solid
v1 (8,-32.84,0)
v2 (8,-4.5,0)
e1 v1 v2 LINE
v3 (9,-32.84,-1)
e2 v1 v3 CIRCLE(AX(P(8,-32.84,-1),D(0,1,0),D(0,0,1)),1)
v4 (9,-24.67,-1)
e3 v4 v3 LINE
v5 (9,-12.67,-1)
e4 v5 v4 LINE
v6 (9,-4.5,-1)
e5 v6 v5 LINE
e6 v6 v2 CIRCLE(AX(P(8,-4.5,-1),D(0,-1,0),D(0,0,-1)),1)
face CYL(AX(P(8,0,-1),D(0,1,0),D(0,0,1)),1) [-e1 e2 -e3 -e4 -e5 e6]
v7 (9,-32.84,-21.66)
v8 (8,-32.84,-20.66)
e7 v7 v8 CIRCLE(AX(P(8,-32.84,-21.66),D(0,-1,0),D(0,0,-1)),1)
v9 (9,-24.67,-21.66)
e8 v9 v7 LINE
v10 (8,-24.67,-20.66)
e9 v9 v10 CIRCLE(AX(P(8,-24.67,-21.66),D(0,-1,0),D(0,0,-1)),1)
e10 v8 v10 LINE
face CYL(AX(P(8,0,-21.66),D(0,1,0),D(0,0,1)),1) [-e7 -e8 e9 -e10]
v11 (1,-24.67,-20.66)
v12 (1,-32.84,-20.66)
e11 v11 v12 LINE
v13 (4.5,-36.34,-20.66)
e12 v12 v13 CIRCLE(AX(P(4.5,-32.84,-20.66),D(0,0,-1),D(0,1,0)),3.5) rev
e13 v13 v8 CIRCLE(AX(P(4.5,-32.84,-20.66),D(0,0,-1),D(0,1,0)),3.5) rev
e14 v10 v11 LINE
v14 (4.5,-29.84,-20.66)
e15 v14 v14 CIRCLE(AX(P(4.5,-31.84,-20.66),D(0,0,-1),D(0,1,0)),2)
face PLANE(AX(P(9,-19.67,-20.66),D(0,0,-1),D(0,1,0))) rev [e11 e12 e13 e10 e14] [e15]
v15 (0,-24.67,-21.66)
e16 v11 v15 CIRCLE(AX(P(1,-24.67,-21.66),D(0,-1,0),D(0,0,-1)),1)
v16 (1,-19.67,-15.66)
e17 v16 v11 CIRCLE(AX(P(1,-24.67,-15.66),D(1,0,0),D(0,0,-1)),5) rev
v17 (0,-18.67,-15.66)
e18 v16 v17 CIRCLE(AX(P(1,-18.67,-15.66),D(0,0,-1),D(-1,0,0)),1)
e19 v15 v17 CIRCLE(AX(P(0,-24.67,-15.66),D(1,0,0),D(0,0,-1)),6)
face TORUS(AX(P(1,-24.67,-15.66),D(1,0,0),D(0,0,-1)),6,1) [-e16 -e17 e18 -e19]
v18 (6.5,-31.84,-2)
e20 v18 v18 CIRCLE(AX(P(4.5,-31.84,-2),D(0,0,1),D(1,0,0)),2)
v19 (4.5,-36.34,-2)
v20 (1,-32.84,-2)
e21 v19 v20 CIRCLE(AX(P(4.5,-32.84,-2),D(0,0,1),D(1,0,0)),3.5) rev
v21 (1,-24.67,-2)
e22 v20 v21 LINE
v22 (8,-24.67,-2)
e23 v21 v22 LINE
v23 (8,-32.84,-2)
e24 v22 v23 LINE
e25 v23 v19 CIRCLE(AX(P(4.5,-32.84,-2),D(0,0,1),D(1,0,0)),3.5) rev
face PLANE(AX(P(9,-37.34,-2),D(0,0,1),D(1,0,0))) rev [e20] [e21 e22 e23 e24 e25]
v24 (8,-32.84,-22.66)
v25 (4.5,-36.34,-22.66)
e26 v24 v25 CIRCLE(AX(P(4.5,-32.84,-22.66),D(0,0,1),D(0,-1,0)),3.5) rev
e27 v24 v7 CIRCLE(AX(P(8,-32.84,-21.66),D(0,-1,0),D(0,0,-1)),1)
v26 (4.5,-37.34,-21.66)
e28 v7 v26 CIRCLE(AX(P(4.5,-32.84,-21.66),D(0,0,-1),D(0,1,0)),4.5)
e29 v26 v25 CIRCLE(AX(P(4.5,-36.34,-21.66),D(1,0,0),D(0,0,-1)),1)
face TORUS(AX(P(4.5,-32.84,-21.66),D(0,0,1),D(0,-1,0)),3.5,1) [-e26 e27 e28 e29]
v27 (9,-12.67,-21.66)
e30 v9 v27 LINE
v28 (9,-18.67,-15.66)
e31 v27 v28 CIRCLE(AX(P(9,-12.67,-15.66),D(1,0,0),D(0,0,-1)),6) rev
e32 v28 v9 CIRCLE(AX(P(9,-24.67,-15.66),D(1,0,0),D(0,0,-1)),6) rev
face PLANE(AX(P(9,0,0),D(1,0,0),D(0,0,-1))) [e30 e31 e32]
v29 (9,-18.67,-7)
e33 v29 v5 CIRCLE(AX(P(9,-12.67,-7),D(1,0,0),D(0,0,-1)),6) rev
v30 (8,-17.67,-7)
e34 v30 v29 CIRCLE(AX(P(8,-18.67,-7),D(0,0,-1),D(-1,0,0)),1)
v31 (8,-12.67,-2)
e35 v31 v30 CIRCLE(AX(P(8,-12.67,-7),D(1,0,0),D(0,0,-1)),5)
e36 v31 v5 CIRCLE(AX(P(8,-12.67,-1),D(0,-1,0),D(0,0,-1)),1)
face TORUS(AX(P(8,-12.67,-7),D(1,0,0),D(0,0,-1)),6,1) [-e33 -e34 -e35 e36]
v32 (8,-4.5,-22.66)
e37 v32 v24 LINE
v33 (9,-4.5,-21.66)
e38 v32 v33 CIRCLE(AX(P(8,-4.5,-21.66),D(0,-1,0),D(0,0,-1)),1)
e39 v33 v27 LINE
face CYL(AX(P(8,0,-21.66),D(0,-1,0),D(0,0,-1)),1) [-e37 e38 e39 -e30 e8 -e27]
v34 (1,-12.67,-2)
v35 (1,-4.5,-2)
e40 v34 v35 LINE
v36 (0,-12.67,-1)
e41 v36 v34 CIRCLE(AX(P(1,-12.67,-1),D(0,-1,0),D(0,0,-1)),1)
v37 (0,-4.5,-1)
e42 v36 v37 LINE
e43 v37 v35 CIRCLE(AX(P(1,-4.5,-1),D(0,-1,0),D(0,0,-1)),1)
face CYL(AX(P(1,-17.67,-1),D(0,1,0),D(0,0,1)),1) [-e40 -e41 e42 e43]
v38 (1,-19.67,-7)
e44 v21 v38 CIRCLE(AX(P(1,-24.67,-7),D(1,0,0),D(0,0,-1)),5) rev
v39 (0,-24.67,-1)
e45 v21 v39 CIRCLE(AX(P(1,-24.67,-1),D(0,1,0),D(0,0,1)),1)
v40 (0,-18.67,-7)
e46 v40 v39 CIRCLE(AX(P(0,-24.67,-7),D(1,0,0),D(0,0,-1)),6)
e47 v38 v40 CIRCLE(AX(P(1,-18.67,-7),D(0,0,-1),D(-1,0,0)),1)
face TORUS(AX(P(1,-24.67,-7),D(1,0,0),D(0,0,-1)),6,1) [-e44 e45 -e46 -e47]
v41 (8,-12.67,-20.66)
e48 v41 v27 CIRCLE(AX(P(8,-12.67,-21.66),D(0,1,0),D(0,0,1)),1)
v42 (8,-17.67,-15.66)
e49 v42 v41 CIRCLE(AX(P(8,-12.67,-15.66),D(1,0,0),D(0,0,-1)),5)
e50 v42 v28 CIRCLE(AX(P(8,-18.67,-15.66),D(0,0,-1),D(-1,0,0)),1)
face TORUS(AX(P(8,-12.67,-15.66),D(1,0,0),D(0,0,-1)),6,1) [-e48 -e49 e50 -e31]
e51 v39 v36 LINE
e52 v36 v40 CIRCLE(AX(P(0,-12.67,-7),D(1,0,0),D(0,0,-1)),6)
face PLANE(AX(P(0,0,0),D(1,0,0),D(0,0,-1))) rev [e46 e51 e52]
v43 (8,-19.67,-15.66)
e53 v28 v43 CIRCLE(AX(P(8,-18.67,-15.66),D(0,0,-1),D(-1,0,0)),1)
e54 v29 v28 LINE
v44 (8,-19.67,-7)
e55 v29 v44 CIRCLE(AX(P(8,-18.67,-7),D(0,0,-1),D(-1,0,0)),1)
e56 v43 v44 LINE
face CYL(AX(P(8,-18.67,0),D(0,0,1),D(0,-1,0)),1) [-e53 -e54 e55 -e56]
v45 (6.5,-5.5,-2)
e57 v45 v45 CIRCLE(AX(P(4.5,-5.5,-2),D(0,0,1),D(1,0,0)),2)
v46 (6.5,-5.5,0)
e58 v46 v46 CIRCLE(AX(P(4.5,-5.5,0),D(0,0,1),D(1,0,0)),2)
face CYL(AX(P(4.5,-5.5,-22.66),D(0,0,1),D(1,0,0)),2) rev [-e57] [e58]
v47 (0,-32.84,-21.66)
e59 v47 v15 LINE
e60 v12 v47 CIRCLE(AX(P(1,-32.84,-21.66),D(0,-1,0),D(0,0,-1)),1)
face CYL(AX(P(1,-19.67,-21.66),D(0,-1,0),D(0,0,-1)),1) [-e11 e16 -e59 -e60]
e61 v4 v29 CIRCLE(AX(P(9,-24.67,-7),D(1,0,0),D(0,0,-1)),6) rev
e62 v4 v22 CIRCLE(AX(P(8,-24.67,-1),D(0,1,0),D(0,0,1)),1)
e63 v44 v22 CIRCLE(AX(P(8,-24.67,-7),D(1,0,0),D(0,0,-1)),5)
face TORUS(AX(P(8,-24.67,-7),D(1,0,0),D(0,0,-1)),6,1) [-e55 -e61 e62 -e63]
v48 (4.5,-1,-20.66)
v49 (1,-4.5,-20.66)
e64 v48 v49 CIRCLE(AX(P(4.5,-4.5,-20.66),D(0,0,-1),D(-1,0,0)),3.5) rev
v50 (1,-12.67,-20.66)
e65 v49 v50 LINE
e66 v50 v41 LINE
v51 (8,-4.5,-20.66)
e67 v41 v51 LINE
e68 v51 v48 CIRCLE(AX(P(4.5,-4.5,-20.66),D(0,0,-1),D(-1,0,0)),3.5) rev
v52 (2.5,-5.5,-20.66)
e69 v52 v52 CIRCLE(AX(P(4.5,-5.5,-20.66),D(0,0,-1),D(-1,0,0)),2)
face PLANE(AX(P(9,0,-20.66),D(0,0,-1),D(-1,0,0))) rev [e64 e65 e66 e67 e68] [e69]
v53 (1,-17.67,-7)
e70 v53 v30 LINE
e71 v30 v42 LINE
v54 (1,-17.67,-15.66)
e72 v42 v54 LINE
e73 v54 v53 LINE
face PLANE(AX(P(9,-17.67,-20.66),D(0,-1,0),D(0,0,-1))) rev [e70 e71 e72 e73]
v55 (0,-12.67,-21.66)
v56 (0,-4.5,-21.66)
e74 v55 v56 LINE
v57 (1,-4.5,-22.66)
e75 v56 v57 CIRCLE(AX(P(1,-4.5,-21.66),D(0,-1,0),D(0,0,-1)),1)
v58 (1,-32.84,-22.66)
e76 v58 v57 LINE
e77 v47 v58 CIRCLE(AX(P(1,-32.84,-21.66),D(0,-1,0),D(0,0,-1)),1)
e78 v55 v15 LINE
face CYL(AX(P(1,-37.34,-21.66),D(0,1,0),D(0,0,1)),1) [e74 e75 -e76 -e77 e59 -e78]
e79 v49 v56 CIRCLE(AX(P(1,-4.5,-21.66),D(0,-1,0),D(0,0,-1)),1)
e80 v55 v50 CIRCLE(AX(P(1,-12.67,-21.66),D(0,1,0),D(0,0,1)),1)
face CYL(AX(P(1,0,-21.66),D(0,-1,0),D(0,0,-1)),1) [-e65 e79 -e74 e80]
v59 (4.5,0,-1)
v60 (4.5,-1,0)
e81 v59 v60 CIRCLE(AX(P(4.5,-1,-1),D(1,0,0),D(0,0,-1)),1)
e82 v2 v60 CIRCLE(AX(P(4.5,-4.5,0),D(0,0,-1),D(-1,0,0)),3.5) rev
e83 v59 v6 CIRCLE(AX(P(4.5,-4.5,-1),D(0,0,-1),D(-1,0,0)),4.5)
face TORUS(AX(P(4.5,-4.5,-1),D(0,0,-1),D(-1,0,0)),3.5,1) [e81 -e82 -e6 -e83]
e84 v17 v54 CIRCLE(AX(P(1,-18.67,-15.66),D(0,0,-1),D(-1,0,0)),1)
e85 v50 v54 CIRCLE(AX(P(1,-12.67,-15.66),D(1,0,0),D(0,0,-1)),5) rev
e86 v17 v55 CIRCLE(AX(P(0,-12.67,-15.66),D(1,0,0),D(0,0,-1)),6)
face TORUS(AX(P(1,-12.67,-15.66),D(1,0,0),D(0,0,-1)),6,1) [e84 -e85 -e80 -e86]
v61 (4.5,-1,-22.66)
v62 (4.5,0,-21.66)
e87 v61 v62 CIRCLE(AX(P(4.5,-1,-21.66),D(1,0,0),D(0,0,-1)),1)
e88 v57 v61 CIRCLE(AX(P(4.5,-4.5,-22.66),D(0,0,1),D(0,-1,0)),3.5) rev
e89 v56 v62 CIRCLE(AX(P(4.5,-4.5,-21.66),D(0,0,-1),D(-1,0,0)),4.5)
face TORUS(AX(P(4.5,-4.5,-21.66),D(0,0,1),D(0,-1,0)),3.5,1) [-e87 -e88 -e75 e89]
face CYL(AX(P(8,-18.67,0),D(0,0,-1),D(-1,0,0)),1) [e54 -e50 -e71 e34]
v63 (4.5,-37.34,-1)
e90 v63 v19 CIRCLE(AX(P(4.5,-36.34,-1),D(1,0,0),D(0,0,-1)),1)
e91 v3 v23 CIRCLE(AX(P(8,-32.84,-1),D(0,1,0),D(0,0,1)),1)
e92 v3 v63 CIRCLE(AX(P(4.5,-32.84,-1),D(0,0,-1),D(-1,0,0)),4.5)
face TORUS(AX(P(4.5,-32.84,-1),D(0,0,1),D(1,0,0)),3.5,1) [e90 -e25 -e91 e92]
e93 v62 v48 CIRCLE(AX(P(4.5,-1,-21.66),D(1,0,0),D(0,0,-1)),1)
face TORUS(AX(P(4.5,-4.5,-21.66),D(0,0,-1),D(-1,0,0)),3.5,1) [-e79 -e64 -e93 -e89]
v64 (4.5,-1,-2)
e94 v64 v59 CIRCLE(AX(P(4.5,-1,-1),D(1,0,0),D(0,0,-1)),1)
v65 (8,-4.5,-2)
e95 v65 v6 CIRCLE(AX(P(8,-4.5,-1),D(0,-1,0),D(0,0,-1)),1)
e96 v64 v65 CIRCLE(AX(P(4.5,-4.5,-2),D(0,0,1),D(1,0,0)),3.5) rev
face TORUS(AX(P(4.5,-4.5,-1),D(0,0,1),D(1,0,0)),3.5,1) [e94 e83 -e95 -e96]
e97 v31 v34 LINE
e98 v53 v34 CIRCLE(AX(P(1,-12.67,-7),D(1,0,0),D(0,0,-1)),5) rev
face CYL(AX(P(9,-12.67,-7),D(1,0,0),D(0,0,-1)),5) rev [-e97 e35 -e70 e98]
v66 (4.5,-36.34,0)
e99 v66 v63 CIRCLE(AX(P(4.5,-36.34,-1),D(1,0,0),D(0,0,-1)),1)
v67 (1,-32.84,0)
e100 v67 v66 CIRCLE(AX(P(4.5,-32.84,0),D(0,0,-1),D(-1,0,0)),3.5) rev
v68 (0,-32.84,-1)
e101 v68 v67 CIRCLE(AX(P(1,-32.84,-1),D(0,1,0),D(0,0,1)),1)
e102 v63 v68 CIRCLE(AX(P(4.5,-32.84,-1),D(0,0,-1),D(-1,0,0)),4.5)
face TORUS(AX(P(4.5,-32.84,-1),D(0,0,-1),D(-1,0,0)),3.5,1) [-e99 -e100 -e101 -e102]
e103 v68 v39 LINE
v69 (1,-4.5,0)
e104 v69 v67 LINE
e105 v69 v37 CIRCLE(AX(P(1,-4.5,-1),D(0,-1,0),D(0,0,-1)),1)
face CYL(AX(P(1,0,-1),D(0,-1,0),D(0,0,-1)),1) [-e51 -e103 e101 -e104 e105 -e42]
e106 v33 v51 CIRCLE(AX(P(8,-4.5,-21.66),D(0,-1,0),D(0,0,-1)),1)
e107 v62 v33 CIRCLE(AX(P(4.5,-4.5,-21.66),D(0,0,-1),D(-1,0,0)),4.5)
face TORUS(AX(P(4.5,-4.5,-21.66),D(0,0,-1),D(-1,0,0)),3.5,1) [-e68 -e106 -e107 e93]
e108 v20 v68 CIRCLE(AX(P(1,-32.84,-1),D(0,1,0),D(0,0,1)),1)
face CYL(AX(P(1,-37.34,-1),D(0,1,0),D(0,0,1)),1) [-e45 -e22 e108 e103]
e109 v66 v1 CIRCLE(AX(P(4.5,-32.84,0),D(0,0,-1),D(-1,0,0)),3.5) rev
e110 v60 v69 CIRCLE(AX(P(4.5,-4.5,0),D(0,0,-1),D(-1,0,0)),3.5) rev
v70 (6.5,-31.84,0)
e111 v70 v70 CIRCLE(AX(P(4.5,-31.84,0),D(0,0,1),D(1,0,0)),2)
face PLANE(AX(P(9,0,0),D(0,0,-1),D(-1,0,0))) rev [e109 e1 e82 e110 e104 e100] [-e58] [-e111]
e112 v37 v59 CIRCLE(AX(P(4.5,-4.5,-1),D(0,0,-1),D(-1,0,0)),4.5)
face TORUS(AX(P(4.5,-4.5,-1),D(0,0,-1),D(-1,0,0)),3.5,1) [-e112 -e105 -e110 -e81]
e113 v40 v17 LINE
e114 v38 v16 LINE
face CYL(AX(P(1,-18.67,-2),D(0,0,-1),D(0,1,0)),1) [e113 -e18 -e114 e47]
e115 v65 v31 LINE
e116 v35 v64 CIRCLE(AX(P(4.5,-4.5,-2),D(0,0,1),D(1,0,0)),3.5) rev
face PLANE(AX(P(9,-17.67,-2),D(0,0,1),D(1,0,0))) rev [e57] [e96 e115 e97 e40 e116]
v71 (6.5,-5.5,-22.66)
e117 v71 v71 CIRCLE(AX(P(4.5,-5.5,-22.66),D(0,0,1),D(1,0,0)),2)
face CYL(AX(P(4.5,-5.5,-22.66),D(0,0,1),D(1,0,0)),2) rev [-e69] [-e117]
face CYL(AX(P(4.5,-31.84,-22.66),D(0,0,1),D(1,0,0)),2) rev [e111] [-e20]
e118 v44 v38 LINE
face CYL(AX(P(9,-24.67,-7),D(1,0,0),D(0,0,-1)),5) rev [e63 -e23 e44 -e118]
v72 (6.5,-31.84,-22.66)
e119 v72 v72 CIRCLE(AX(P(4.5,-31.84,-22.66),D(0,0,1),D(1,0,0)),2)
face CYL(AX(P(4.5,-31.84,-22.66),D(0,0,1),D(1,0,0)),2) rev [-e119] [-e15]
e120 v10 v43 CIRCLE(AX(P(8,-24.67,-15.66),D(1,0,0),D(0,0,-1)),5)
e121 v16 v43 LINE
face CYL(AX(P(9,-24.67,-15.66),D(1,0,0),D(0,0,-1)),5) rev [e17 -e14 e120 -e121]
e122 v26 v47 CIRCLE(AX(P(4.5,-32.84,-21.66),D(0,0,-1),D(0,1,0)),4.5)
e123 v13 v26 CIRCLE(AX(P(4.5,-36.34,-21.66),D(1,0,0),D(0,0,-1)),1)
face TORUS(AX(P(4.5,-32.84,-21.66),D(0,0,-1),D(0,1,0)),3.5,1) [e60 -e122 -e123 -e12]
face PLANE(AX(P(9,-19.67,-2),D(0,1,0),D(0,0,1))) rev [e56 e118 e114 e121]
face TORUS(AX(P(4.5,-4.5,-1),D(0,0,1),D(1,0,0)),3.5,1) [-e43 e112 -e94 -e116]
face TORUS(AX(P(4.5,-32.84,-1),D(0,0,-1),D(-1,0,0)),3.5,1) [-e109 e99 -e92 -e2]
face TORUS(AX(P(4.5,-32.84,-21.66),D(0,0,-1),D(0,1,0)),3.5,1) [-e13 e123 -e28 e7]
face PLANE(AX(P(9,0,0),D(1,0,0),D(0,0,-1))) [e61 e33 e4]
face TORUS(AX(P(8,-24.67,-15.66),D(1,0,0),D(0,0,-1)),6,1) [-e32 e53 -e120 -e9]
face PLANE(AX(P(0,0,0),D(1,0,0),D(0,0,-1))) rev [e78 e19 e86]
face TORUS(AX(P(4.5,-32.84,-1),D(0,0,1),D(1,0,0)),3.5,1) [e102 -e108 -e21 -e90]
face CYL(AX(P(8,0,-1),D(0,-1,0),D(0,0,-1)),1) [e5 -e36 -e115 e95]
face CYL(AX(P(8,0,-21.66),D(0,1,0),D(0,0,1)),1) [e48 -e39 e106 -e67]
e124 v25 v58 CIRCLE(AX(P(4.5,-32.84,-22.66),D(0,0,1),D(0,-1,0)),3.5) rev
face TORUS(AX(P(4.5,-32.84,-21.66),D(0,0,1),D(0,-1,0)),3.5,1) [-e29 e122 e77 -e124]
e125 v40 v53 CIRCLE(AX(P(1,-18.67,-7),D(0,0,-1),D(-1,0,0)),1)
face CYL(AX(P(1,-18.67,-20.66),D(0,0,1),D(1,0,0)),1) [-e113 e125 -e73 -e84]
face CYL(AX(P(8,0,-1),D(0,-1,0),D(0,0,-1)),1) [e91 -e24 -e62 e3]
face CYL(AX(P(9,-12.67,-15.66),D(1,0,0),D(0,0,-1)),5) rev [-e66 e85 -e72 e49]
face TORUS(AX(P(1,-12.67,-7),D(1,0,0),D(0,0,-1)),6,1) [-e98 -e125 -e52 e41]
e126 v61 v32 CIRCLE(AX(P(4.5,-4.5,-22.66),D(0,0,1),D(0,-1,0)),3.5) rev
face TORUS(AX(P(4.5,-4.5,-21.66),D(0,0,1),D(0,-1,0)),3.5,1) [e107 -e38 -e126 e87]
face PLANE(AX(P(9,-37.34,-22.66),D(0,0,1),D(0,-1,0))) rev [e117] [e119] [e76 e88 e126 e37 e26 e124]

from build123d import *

# Parameters (mm, degrees)
BOSS_EXTRUDE1_DEPTH = 9
SKETCH2_R           = 2
CUT_EXTRUDE1_DEPTH  = 45.595416805
FILLET1_R           = 5
FILLET3_R           = 4.5
FILLET4_R           = 1


with BuildPart() as part:
    # Sketch1 → Boss-Extrude1 (new body)
    with BuildSketch(Plane(origin=(0, 0, 0), x_dir=(0, 0, -1), z_dir=(1, 0, 0))):
        Polygon((0, 0), (0, -37.34), (2, -37.34), (2, -19.67), (20.66, -19.67), (20.66, -37.34), (22.66, -37.34), (22.66, 0), (20.66, 0), (20.66, -17.67), (2, -17.67), (2, 0), align=None)
    extrude(amount=BOSS_EXTRUDE1_DEPTH)

    # Sketch2 → Cut-Extrude1 (cut, through all)
    with BuildSketch(Plane.XY):
        with Locations((4.5, -5.5)):
            Circle(SKETCH2_R)
        with Locations((4.5, -31.84)):
            Circle(SKETCH2_R)
    extrude(amount=-CUT_EXTRUDE1_DEPTH, mode=Mode.SUBTRACT)

    # Fillet1
    fillet1_edges = [part.edges().sort_by_distance(p)[0] for p in [
        (4.5, -17.67, -2),
        (4.5, -17.67, -20.66),
        (4.5, -19.67, -20.66),
        (4.5, -19.67, -2),
    ]]
    fillet(fillet1_edges, radius=FILLET1_R)

    # Fillet3
    fillet3_edges = [part.edges().sort_by_distance(p)[0] for p in [
        (9, 0, -1),
        (0, 0, -1),
        (9, 0, -21.66),
        (0, 0, -21.66),
        (0, -37.34, -1),
        (9, -37.34, -1),
        (9, -37.34, -21.66),
        (0, -37.34, -21.66),
    ]]
    fillet(fillet3_edges, radius=FILLET3_R - 0.0001)  # a hair under: the kernel refuses the full size

    # Fillet4
    fillet4_edges = [part.edges().sort_by_distance(p)[0] for p in [
        (7.682009805, -36.022009805, -22.66),
        (1.317990195, -36.022009805, -22.66),
        (0, -18.67, -22.66),
        (1.317990195, -1.317990195, -22.66),
        (7.682009805, -1.317990195, -22.66),
        (7.682009805, -1.317990195, 0),
        (1.317990195, -1.317990195, 0),
        (0, -18.67, 0),
        (1.317990195, -36.022009805, 0),
        (7.682009805, -36.022009805, 0),
        (9, -19.67, -11.33),
        (9, -21.134466094, -3.464466094),
        (9, -28.75505, -2),
        (7.682009805, -36.022009805, -2),
        (1.317990195, -36.022009805, -2),
        (0, -28.75505, -2),
        (0, -21.134466094, -3.464466094),
        (0, -19.67, -11.33),
        (0, -21.134466094, -19.195533906),
        (0, -28.75505, -20.66),
        (1.317990195, -36.022009805, -20.66),
        (7.682009805, -36.022009805, -20.66),
        (9, -28.75505, -20.66),
        (9, -8.58495, -20.66),
        (7.682009805, -1.317990195, -20.66),
        (1.317990195, -1.317990195, -20.66),
        (0, -8.58495, -20.66),
        (0, -16.205533906, -19.195533906),
        (0, -17.67, -11.33),
        (0, -16.205533906, -3.464466094),
        (0, -8.58495, -2),
        (1.317990195, -1.317990195, -2),
        (7.682009805, -1.317990195, -2),
        (9, -8.58495, -2),
        (9, -16.205533906, -3.464466094),
        (9, -17.67, -11.33),
        (9, -18.67, -22.66),
        (9, -18.67, 0),
        (9, -21.134466094, -19.195533906),
        (9, -16.205533906, -19.195533906),
    ]]
    fillet(fillet4_edges, radius=FILLET4_R - 0.0001)  # a hair under: the kernel refuses the full size


solid = part.part
